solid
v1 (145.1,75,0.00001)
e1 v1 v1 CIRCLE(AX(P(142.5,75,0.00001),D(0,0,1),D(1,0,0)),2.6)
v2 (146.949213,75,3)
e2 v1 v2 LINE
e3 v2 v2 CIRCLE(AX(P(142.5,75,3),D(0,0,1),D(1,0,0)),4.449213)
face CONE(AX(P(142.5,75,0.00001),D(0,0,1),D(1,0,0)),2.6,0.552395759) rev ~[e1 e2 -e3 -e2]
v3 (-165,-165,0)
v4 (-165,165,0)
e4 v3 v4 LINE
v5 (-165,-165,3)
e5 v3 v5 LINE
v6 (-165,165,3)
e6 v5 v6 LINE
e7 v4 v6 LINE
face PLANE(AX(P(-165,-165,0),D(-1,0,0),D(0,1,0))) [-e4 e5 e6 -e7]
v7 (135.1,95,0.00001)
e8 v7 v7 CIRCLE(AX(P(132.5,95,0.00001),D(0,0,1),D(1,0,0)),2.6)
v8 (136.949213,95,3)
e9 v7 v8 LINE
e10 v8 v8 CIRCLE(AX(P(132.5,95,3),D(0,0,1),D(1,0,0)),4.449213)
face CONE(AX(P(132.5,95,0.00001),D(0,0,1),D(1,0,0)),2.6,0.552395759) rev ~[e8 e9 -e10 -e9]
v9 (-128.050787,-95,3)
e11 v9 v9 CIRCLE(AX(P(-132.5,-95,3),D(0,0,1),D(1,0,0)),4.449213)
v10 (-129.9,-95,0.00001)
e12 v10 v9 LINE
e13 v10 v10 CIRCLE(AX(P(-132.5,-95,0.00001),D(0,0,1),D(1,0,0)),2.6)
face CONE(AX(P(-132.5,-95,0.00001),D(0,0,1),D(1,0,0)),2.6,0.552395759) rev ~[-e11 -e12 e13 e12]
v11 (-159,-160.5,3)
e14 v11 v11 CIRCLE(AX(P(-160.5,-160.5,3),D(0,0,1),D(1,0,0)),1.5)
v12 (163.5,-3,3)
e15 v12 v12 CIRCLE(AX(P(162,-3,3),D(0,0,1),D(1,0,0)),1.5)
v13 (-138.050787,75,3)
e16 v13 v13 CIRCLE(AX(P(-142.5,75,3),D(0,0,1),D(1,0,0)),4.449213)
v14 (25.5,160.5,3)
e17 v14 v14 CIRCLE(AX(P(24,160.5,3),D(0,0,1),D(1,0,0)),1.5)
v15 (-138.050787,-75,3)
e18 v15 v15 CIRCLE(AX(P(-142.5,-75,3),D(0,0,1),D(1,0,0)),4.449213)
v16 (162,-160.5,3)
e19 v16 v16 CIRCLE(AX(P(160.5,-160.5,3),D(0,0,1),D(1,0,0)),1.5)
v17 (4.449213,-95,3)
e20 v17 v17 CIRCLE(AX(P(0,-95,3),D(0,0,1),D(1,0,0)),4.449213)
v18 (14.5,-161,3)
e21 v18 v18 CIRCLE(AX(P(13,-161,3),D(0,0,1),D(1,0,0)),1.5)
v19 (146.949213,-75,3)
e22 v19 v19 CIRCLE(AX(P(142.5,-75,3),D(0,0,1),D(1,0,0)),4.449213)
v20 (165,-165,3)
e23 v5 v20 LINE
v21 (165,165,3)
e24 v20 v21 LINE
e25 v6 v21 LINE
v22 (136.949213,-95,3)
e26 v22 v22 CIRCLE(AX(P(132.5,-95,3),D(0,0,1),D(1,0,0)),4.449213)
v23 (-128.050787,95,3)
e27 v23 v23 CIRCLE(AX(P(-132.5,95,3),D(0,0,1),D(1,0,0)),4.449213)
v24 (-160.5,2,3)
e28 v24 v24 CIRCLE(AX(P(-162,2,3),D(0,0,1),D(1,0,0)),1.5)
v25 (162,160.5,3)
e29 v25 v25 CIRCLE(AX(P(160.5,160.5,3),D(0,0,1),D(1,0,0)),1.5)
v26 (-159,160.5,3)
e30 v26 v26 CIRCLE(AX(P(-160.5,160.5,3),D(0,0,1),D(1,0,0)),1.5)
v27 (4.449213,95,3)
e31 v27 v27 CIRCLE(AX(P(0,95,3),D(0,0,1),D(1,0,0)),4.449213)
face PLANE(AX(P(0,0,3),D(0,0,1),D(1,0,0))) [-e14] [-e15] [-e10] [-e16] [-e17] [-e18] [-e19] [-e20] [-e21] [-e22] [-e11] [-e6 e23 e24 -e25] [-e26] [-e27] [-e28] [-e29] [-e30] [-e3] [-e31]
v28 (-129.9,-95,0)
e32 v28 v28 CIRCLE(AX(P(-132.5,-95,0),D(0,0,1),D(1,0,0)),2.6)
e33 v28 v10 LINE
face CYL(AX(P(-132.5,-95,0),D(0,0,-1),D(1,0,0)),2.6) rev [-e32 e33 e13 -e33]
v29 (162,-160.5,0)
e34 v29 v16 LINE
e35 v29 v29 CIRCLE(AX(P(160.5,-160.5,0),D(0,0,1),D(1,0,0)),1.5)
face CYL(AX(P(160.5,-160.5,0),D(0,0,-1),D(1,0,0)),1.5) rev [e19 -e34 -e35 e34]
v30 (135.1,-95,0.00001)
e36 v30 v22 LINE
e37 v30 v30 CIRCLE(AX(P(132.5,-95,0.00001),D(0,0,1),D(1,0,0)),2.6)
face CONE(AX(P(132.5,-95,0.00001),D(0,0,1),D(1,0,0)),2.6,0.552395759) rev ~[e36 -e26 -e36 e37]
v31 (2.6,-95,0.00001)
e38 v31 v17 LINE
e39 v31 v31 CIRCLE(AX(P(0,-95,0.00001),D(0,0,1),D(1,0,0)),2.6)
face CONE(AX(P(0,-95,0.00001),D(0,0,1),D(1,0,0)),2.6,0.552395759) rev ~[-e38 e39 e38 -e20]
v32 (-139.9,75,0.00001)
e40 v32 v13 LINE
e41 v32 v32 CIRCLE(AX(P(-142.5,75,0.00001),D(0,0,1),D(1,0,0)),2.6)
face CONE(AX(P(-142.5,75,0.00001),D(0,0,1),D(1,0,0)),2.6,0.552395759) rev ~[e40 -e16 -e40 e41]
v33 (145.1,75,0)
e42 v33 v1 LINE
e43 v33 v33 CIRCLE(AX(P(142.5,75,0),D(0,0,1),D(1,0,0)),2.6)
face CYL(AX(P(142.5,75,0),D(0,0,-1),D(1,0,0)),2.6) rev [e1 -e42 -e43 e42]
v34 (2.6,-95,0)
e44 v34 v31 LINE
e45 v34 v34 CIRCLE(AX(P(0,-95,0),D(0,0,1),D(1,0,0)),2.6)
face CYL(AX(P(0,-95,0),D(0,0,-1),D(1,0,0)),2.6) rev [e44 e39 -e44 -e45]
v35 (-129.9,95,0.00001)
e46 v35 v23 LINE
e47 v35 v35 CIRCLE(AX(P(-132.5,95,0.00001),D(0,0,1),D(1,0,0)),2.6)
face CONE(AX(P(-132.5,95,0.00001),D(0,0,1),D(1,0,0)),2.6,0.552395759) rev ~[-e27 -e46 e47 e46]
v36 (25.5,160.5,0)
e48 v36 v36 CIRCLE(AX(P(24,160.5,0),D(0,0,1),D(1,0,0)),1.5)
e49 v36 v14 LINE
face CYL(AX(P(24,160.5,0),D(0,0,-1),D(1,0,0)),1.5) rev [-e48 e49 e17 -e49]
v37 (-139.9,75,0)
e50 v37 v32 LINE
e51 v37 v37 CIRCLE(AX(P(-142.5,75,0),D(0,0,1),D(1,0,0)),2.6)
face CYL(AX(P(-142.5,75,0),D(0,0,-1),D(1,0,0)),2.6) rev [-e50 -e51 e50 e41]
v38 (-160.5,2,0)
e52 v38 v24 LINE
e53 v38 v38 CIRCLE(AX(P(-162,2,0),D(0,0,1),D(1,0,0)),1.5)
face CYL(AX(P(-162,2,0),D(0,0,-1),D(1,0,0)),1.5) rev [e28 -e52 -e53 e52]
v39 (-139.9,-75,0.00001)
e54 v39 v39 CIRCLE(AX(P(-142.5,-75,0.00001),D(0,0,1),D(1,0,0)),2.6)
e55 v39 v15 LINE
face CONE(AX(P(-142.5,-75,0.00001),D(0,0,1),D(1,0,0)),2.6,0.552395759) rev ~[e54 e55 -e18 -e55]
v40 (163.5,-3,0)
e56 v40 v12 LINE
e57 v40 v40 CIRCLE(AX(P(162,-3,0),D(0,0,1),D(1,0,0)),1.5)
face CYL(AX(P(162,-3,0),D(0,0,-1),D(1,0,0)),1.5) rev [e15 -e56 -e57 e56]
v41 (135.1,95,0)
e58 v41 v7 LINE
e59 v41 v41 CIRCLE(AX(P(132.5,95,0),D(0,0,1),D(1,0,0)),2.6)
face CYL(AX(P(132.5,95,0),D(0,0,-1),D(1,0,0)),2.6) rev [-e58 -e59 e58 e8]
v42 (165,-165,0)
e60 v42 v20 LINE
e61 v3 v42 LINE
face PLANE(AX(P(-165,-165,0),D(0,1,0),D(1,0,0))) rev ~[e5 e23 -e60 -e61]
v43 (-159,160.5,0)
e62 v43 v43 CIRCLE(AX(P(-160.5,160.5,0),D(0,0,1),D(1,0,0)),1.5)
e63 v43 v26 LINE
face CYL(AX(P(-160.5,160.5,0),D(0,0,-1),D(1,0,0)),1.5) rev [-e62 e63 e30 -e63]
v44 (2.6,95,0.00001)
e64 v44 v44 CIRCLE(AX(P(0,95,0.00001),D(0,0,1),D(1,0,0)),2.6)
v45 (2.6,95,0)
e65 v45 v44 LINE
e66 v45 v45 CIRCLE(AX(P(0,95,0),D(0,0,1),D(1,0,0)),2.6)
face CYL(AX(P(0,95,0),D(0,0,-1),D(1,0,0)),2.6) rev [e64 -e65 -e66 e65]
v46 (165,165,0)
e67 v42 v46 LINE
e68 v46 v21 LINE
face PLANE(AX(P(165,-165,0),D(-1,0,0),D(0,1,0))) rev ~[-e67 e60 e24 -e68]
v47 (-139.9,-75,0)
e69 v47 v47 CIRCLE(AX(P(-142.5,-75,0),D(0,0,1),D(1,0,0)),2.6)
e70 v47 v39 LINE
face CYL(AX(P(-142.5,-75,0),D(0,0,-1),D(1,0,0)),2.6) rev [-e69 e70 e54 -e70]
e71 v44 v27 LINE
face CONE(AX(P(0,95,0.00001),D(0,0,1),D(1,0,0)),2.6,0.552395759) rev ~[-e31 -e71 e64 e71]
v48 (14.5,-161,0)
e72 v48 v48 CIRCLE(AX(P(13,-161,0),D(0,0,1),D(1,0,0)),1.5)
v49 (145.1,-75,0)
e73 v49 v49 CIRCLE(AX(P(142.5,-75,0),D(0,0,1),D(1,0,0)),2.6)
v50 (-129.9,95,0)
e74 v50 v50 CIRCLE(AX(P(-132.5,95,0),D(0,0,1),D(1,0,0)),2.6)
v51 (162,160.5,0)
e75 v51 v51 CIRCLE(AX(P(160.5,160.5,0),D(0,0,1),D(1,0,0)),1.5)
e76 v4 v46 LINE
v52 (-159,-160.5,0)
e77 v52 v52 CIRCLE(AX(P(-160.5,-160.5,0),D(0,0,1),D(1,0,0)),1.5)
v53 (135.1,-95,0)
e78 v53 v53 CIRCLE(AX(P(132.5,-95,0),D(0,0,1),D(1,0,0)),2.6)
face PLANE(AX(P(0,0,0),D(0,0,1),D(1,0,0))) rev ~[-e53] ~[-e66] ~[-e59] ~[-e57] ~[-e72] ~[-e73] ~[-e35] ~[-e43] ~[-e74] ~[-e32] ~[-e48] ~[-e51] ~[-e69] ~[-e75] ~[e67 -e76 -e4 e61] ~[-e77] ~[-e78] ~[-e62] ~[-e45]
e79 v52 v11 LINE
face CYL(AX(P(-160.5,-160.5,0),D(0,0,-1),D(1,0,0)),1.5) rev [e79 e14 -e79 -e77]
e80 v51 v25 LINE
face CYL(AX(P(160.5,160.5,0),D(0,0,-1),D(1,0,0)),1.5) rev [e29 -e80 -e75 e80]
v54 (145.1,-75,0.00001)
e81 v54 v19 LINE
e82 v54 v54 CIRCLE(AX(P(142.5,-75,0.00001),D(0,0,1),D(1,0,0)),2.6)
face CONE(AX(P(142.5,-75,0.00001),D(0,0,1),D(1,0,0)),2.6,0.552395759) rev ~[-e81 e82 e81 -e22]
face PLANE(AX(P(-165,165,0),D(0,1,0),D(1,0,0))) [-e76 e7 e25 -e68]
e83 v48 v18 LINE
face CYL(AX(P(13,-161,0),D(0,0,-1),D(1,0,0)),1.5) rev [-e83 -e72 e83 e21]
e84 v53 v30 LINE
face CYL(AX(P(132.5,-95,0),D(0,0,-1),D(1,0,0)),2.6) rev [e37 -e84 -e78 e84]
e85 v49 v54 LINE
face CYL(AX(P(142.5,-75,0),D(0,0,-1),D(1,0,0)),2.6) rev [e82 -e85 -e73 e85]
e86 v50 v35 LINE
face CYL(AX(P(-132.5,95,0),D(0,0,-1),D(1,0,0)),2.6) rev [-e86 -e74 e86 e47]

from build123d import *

# Parameters (mm, degrees)
F0_W       = 330
F0_H       = 330
F0_R       = 1.5
F0_R_2     = 2.6
F1_DEPTH   = 3
F2_SIZE2   = 1.849213
F2_SIZE    = 2.99999
F3_SIZE2   = 1.849213
F3_SIZE    = 2.99999
F3_2_SIZE2 = 1.849213
F3_2_SIZE  = 2.99999
F3_3_SIZE2 = 1.849213
F3_3_SIZE  = 2.99999
F3_4_SIZE2 = 1.849213
F3_4_SIZE  = 2.99999
F3_5_SIZE2 = 1.849213
F3_5_SIZE  = 2.99999
F3_6_SIZE2 = 1.849213
F3_6_SIZE  = 2.99999
F3_7_SIZE2 = 1.849213
F3_7_SIZE  = 2.99999
F3_8_SIZE2 = 1.849213
F3_8_SIZE  = 2.99999
F3_9_SIZE2 = 1.849213
F3_9_SIZE  = 2.99999


# Not quite as in the source:
# - a fillet or chamfer is up to 0.001 mm smaller than in the source, because OpenCascade refuses the exact size


with BuildPart() as f1:
    # F0 (on Top) → F1 (new body)
    with BuildSketch(Plane.XY):
        Rectangle(F0_W, F0_H)
        with Locations((-160.5, -160.5)):
            Circle(F0_R, mode=Mode.SUBTRACT)
        with Locations((-132.5, -95)):
            Circle(F0_R_2, mode=Mode.SUBTRACT)
        with Locations((-142.5, -75)):
            Circle(F0_R_2, mode=Mode.SUBTRACT)
        with Locations((13, -161)):
            Circle(F0_R, mode=Mode.SUBTRACT)
        with Locations((0, -95)):
            Circle(F0_R_2, mode=Mode.SUBTRACT)
        with Locations((160.5, -160.5)):
            Circle(F0_R, mode=Mode.SUBTRACT)
        with Locations((132.5, -95)):
            Circle(F0_R_2, mode=Mode.SUBTRACT)
        with Locations((142.5, -75)):
            Circle(F0_R_2, mode=Mode.SUBTRACT)
        with Locations((162, -3)):
            Circle(F0_R, mode=Mode.SUBTRACT)
        with Locations((-162, 2)):
            Circle(F0_R, mode=Mode.SUBTRACT)
        with Locations((-142.5, 75)):
            Circle(F0_R_2, mode=Mode.SUBTRACT)
        with Locations((-132.5, 95)):
            Circle(F0_R_2, mode=Mode.SUBTRACT)
        with Locations((-160.5, 160.5)):
            Circle(F0_R, mode=Mode.SUBTRACT)
        with Locations((142.5, 75)):
            Circle(F0_R_2, mode=Mode.SUBTRACT)
        with Locations((0, 95)):
            Circle(F0_R_2, mode=Mode.SUBTRACT)
        with Locations((24, 160.5)):
            Circle(F0_R, mode=Mode.SUBTRACT)
        with Locations((132.5, 95)):
            Circle(F0_R_2, mode=Mode.SUBTRACT)
        with Locations((160.5, 160.5)):
            Circle(F0_R, mode=Mode.SUBTRACT)
    extrude(amount=F1_DEPTH)

    # F2 (size 3 and 1.8492230955 in the source; OpenCascade refuses exactly that, so slightly less here)
    f2_edges = [f1.edges().sort_by_distance(p)[0] for p in [
        (-135.1, 95, 3),
    ]]
    f2_side = f1.faces().sort_by_distance((-135.1, 95, 1.5))[0]
    chamfer(f2_edges, length=F2_SIZE, length2=F2_SIZE2, reference=f2_side)

    # F3 (size 3 and 1.8492230955 in the source; OpenCascade refuses exactly that, so slightly less here)
    f3_edges = [f1.edges().sort_by_distance(p)[0] for p in [
        (-145.1, 75, 3),
    ]]
    f3_side = f1.faces().sort_by_distance((-145.1, 75, 1.5))[0]
    chamfer(f3_edges, length=F3_SIZE, length2=F3_SIZE2, reference=f3_side)

    # F3#2 (size 3 and 1.8492230955 in the source; OpenCascade refuses exactly that, so slightly less here)
    f3_2_edges = [f1.edges().sort_by_distance(p)[0] for p in [
        (-2.6, 95, 3),
    ]]
    f3_2_side = f1.faces().sort_by_distance((-2.6, 95, 1.5))[0]
    chamfer(f3_2_edges, length=F3_2_SIZE, length2=F3_2_SIZE2, reference=f3_2_side)

    # F3#3 (size 3 and 1.8492230955 in the source; OpenCascade refuses exactly that, so slightly less here)
    f3_3_edges = [f1.edges().sort_by_distance(p)[0] for p in [
        (129.9, 95, 3),
    ]]
    f3_3_side = f1.faces().sort_by_distance((129.9, 95, 1.5))[0]
    chamfer(f3_3_edges, length=F3_3_SIZE, length2=F3_3_SIZE2, reference=f3_3_side)

    # F3#4 (size 3 and 1.8492230955 in the source; OpenCascade refuses exactly that, so slightly less here)
    f3_4_edges = [f1.edges().sort_by_distance(p)[0] for p in [
        (139.9, 75, 3),
    ]]
    f3_4_side = f1.faces().sort_by_distance((139.9, 75, 1.5))[0]
    chamfer(f3_4_edges, length=F3_4_SIZE, length2=F3_4_SIZE2, reference=f3_4_side)

    # F3#5 (size 3 and 1.8492230955 in the source; OpenCascade refuses exactly that, so slightly less here)
    f3_5_edges = [f1.edges().sort_by_distance(p)[0] for p in [
        (139.9, -75, 3),
    ]]
    f3_5_side = f1.faces().sort_by_distance((139.9, -75, 1.5))[0]
    chamfer(f3_5_edges, length=F3_5_SIZE, length2=F3_5_SIZE2, reference=f3_5_side)

    # F3#6 (size 3 and 1.8492230955 in the source; OpenCascade refuses exactly that, so slightly less here)
    f3_6_edges = [f1.edges().sort_by_distance(p)[0] for p in [
        (129.9, -95, 3),
    ]]
    f3_6_side = f1.faces().sort_by_distance((129.9, -95, 1.5))[0]
    chamfer(f3_6_edges, length=F3_6_SIZE, length2=F3_6_SIZE2, reference=f3_6_side)

    # F3#7 (size 3 and 1.8492230955 in the source; OpenCascade refuses exactly that, so slightly less here)
    f3_7_edges = [f1.edges().sort_by_distance(p)[0] for p in [
        (-2.6, -95, 3),
    ]]
    f3_7_side = f1.faces().sort_by_distance((-2.6, -95, 1.5))[0]
    chamfer(f3_7_edges, length=F3_7_SIZE, length2=F3_7_SIZE2, reference=f3_7_side)

    # F3#8 (size 3 and 1.8492230955 in the source; OpenCascade refuses exactly that, so slightly less here)
    f3_8_edges = [f1.edges().sort_by_distance(p)[0] for p in [
        (-135.1, -95, 3),
    ]]
    f3_8_side = f1.faces().sort_by_distance((-135.1, -95, 1.5))[0]
    chamfer(f3_8_edges, length=F3_8_SIZE, length2=F3_8_SIZE2, reference=f3_8_side)

    # F3#9 (size 3 and 1.8492230955 in the source; OpenCascade refuses exactly that, so slightly less here)
    f3_9_edges = [f1.edges().sort_by_distance(p)[0] for p in [
        (-145.1, -75, 3),
    ]]
    f3_9_side = f1.faces().sort_by_distance((-145.1, -75, 1.5))[0]
    chamfer(f3_9_edges, length=F3_9_SIZE, length2=F3_9_SIZE2, reference=f3_9_side)


solid = f1.part
